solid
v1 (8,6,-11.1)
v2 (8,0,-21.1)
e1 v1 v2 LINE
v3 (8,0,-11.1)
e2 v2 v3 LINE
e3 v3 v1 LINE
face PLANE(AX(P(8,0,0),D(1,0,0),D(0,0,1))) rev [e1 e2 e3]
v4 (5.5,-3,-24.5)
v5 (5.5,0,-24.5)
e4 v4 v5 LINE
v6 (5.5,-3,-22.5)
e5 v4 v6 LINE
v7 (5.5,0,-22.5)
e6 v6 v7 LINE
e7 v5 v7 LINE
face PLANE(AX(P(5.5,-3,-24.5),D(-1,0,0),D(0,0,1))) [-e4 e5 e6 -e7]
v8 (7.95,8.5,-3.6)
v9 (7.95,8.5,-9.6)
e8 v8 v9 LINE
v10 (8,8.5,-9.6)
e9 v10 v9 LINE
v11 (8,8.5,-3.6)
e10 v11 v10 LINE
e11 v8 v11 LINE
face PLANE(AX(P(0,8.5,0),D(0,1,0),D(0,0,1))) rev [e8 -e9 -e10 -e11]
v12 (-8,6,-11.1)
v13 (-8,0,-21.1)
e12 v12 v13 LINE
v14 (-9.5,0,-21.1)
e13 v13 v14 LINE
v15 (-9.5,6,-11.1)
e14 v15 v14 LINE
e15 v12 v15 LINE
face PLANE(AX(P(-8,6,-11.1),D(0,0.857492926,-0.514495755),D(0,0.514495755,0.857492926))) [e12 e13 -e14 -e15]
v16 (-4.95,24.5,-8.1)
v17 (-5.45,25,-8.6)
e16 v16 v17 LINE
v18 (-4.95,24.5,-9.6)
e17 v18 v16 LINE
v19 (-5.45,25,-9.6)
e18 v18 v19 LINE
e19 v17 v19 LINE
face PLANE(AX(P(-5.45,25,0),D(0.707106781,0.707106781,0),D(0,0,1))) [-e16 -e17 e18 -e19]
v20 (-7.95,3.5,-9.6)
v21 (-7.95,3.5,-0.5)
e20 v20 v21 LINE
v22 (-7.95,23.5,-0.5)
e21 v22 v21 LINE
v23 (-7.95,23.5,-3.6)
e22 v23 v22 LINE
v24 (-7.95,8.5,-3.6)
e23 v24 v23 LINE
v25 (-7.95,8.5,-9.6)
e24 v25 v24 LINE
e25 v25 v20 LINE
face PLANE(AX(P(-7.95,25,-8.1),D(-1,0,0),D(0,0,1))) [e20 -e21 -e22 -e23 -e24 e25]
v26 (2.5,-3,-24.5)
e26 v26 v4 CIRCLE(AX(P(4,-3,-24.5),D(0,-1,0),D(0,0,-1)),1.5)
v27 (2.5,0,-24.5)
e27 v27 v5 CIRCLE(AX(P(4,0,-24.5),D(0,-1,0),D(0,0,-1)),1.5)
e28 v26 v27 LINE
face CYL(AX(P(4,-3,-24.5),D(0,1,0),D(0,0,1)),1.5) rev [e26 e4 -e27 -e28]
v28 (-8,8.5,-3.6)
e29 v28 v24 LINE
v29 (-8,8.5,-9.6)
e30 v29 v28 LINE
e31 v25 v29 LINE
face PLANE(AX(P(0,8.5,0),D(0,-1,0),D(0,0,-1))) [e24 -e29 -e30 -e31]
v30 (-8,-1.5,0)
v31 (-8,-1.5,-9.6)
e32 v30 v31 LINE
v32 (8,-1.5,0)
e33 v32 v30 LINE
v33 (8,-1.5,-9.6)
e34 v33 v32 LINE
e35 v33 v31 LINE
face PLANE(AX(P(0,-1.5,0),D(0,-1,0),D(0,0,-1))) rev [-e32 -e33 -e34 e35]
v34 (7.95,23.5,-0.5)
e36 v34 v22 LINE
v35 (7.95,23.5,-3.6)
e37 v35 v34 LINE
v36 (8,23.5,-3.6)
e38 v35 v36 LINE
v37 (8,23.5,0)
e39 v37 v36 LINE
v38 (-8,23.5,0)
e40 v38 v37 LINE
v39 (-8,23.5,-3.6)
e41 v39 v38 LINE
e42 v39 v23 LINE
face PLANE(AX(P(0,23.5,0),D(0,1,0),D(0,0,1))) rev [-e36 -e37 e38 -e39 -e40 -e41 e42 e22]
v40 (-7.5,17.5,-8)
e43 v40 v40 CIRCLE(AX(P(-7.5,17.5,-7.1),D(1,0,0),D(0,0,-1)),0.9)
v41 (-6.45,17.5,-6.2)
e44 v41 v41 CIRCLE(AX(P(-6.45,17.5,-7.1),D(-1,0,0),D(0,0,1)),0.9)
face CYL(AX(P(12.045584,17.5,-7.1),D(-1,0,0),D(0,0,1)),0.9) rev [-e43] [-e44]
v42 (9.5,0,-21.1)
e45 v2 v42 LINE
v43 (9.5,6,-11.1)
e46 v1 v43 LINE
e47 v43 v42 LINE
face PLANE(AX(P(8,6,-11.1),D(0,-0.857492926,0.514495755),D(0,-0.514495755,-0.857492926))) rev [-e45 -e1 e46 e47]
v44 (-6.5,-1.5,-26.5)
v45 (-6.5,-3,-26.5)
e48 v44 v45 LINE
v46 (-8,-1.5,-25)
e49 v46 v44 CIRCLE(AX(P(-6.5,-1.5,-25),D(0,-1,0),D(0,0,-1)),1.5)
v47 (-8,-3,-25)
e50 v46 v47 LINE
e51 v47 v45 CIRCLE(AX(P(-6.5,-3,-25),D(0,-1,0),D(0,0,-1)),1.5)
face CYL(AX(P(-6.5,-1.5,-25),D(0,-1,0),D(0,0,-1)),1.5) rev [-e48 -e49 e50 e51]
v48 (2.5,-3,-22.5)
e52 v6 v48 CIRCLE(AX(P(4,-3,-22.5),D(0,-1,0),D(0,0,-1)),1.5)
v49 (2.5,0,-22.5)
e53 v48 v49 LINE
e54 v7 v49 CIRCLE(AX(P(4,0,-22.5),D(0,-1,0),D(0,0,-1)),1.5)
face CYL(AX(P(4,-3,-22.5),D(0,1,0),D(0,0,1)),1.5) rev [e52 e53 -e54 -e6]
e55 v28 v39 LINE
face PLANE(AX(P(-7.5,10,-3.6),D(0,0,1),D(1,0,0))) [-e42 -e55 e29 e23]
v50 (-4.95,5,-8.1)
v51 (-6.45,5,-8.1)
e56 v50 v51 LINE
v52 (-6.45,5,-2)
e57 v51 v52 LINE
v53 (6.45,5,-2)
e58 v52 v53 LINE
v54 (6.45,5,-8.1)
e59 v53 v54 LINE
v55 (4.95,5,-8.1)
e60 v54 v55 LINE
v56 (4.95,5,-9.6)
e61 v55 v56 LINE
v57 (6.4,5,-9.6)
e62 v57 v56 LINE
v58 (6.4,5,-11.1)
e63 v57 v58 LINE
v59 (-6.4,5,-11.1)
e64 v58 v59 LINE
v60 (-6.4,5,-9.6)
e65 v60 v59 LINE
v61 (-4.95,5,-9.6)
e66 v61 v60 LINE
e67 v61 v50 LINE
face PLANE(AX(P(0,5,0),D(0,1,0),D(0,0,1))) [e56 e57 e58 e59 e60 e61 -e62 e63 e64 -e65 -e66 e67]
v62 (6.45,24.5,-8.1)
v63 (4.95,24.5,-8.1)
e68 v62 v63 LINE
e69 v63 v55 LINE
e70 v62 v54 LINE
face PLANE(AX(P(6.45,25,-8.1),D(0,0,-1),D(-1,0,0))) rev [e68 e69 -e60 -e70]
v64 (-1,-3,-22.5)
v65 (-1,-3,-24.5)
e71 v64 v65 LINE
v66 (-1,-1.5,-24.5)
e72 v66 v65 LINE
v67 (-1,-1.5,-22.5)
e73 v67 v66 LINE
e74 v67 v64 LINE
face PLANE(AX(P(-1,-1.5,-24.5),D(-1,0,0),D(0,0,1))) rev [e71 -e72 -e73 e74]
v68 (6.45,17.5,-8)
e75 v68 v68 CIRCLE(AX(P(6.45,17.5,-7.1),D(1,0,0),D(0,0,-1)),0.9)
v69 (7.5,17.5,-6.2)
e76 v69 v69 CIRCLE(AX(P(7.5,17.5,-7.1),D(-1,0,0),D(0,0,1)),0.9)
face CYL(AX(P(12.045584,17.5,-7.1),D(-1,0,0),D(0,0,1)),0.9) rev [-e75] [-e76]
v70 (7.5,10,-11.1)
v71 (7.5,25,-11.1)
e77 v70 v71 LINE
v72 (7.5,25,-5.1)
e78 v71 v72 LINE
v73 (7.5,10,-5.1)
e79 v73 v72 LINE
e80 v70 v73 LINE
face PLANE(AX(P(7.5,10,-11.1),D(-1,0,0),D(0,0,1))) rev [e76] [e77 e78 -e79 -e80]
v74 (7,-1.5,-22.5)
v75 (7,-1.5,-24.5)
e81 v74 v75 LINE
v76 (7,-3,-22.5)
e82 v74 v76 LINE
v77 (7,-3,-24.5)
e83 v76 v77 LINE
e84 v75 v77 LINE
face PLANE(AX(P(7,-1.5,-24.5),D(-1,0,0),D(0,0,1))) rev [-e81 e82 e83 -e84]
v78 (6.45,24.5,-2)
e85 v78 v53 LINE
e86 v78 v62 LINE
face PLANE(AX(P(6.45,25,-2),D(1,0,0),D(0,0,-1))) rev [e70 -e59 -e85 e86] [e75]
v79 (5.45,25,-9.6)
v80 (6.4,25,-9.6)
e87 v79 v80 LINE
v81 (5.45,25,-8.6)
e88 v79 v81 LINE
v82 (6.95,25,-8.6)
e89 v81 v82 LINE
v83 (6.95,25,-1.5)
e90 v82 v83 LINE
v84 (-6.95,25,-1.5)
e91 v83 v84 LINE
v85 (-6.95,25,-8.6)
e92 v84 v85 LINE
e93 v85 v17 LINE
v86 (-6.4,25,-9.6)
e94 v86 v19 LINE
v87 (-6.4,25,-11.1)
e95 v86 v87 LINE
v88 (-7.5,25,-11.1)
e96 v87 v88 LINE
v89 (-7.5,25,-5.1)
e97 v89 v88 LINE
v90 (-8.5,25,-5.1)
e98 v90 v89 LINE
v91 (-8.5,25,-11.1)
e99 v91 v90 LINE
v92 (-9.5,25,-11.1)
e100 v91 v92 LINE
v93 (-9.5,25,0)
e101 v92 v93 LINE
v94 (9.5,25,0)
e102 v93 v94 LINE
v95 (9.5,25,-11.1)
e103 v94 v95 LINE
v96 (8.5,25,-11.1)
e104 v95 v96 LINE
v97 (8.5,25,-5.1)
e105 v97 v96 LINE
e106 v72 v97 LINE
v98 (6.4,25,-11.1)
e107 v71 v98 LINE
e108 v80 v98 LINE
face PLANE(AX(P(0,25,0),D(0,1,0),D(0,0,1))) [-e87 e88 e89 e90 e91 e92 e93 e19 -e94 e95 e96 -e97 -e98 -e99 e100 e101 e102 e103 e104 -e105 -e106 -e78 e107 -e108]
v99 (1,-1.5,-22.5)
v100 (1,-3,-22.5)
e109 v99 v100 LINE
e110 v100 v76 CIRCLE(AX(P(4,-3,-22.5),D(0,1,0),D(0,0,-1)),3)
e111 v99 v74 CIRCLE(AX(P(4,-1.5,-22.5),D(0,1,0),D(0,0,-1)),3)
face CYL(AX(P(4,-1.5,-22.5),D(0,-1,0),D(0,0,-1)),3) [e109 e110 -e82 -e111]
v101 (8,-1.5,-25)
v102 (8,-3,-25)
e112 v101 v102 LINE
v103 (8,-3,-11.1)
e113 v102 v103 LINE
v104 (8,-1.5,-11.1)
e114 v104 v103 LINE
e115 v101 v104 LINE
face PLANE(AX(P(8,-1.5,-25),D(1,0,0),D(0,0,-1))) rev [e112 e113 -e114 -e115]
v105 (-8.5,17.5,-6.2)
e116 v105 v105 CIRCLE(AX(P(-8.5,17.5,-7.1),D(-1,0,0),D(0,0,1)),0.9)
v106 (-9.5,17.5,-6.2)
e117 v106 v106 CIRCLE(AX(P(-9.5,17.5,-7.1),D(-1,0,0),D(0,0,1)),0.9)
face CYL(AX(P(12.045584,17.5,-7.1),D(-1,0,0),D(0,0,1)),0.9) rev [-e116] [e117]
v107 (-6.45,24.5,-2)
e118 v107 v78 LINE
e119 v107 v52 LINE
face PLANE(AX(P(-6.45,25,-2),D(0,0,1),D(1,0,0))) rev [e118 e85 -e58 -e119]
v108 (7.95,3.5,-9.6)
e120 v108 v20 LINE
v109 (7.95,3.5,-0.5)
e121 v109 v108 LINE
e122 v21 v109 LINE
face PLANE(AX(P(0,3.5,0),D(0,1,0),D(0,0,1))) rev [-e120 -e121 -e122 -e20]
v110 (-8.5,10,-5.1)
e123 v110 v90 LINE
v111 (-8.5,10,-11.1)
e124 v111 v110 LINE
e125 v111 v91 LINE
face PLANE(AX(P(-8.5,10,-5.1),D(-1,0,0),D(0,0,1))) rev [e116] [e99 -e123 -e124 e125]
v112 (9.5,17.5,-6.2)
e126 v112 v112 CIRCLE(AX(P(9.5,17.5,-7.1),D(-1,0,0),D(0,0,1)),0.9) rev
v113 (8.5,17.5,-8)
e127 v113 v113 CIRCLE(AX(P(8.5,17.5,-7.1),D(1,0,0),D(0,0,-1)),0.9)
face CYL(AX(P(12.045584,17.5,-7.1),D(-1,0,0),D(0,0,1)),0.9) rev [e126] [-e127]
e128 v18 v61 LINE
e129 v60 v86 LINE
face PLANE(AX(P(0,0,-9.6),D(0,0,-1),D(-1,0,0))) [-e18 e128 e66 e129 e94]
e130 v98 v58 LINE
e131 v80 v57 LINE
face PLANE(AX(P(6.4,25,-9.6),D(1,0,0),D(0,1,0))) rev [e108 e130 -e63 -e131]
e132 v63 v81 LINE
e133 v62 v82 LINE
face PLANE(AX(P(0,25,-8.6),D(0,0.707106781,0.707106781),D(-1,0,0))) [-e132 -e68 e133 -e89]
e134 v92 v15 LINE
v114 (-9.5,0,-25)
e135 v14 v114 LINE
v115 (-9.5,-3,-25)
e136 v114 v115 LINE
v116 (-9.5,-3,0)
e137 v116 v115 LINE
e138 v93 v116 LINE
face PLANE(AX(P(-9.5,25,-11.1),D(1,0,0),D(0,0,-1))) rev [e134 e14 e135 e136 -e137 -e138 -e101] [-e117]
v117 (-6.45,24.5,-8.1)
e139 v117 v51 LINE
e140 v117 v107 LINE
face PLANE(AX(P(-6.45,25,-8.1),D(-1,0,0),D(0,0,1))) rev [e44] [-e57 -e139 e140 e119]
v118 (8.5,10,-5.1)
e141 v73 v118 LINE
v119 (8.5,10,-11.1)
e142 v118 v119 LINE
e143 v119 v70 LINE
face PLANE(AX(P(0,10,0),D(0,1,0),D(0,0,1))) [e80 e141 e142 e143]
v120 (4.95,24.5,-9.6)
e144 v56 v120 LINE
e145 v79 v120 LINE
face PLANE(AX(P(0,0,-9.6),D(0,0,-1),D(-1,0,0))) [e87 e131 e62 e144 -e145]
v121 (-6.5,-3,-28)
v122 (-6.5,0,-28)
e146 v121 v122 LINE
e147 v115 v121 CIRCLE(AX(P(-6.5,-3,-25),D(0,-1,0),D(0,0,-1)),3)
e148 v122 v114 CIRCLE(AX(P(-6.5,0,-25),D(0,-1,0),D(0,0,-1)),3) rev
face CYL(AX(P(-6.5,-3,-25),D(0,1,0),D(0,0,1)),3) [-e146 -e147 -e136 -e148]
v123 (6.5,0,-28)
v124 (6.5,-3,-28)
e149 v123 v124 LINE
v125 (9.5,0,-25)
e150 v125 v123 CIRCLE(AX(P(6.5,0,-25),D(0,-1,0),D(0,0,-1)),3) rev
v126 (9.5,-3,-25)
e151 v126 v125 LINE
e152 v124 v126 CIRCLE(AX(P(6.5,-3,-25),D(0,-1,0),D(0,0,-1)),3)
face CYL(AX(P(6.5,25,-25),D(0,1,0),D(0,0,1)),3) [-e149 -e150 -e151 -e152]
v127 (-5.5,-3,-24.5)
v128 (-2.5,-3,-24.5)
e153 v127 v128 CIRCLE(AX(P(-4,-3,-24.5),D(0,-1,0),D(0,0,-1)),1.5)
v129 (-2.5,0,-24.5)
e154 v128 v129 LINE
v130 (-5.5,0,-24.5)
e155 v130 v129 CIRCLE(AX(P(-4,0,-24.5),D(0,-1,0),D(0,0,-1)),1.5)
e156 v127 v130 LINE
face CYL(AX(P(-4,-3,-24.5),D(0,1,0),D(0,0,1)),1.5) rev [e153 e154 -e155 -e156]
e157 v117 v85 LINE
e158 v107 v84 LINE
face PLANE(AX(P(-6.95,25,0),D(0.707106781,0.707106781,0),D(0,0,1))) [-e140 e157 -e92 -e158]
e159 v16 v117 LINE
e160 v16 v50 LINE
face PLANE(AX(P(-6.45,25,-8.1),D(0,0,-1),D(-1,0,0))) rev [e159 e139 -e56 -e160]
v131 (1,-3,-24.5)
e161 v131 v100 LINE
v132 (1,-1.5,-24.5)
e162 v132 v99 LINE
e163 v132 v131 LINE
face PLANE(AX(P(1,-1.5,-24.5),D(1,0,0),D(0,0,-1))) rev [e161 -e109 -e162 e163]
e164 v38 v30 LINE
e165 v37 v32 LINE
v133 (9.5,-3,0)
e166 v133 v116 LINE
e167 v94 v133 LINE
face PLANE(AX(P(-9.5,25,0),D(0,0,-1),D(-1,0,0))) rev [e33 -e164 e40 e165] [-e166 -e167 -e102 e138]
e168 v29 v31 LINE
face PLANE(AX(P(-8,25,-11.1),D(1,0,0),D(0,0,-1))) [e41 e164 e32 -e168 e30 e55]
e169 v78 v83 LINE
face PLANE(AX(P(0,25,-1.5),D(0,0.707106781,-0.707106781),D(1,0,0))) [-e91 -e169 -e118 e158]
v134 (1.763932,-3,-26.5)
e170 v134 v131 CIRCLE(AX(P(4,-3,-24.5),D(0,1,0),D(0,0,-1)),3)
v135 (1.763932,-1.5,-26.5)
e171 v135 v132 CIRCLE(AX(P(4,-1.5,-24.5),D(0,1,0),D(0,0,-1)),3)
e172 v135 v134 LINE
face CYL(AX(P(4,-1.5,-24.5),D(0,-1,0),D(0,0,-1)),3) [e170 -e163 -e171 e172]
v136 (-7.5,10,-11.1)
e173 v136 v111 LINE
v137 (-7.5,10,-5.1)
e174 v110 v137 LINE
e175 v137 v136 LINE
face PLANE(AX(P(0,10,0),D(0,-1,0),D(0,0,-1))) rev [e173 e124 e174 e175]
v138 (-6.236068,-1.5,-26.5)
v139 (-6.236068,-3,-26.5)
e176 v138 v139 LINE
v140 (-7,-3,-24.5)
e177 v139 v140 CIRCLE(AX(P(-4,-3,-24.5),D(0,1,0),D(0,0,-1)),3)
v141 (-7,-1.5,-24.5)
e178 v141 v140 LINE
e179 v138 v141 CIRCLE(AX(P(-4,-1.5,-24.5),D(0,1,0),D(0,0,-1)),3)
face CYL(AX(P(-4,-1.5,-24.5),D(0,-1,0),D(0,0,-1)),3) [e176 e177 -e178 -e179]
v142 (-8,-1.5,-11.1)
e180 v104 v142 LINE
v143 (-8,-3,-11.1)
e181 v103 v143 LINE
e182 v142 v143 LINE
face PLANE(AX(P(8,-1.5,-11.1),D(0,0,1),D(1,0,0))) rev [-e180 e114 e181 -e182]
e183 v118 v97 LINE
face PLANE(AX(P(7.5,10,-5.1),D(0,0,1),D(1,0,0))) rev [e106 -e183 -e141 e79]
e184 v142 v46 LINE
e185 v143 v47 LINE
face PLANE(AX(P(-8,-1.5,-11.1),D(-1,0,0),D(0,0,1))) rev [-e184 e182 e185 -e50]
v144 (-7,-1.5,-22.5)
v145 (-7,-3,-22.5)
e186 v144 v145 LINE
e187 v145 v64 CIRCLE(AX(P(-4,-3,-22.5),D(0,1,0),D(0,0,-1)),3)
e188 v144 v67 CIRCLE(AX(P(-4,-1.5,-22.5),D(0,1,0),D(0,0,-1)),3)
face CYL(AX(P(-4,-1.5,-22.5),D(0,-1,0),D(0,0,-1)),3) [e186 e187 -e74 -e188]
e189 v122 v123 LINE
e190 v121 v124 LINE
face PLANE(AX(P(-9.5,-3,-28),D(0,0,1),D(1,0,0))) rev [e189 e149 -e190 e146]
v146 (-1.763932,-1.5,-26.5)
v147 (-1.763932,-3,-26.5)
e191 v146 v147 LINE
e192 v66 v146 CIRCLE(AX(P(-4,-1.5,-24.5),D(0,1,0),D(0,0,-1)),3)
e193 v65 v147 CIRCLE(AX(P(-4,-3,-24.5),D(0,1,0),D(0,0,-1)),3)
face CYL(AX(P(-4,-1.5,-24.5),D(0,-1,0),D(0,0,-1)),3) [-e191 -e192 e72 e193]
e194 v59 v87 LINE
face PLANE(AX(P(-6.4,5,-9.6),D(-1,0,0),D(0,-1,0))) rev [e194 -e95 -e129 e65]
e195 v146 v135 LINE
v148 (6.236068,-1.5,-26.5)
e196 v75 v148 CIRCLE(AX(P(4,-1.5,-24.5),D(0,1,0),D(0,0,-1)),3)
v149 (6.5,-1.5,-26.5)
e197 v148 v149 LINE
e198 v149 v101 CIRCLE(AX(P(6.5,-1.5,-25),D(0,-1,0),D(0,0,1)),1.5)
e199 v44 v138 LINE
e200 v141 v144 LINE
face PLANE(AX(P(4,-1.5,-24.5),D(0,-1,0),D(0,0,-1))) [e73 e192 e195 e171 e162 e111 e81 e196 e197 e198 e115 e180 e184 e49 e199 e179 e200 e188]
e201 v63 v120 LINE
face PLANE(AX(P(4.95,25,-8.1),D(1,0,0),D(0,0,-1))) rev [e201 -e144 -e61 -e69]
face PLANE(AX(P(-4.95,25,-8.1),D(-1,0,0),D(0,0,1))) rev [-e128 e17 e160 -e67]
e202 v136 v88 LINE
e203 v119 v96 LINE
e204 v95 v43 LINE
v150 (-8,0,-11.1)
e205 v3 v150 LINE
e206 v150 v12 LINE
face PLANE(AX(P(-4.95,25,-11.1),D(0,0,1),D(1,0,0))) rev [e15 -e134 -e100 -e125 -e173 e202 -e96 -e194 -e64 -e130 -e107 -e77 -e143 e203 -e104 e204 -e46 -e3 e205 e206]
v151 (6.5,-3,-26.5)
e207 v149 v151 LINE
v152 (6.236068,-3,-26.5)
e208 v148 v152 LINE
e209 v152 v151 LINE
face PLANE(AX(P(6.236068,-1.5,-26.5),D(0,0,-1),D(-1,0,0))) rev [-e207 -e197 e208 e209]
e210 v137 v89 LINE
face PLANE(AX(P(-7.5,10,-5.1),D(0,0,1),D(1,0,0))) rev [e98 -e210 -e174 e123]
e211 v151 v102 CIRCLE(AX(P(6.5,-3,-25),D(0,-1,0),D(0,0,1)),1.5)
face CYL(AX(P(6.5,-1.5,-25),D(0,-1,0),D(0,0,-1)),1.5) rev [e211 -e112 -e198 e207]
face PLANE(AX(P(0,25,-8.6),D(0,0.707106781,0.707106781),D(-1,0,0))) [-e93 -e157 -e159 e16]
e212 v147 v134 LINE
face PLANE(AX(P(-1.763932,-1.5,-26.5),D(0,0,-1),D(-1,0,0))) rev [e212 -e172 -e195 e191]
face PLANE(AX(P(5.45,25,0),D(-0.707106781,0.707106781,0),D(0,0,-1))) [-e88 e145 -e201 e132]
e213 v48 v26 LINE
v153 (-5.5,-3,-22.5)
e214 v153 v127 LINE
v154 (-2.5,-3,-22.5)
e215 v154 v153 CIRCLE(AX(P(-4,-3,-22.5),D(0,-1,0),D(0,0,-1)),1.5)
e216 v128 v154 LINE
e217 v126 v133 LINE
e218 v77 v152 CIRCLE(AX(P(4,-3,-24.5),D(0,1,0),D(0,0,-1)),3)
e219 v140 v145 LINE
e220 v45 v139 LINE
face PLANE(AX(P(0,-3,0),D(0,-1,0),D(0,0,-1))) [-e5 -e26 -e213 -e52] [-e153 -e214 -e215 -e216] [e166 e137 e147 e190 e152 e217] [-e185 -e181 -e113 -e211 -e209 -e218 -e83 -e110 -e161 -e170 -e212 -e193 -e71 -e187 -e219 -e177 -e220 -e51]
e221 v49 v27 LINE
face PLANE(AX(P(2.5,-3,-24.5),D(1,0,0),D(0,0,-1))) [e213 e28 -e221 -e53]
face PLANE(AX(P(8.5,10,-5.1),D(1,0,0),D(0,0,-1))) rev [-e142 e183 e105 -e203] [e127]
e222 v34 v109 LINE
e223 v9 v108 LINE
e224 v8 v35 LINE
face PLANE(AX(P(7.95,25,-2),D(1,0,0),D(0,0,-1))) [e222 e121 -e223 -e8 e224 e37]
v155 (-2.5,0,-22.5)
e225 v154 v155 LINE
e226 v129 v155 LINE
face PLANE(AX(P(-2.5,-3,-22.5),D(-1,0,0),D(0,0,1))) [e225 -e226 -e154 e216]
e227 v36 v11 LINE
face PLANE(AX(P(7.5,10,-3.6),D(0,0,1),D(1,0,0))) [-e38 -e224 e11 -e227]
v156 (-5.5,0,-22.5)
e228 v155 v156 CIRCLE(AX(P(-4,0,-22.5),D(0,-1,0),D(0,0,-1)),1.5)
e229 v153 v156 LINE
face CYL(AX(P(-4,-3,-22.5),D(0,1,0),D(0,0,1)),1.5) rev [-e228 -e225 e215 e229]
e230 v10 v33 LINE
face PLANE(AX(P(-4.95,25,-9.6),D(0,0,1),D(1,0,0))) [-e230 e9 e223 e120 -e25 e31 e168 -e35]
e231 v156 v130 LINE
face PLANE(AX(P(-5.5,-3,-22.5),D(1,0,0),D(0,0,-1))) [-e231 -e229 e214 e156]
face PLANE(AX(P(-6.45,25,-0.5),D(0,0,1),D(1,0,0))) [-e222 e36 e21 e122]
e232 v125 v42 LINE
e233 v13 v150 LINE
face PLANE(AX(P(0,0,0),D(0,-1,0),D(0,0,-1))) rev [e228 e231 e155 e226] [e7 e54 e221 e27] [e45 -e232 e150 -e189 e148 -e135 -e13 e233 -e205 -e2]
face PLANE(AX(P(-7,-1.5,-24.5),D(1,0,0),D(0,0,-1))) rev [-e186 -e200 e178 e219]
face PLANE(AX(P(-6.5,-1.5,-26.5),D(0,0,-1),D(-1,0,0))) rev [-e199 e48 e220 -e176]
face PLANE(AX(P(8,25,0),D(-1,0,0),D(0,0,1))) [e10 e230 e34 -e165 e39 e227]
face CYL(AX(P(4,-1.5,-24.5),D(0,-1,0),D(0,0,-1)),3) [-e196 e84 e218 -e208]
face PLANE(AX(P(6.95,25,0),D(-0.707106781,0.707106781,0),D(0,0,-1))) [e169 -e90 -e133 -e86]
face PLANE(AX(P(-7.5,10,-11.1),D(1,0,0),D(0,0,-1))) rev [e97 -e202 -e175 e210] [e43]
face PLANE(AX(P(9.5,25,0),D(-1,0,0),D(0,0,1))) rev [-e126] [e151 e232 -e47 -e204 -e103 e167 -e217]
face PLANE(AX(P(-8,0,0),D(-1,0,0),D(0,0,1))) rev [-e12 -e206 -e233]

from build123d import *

# Parameters (mm, degrees)
EXTRUDE_1_DEPTH     = 25
SKETCH_2_W          = 19
SKETCH_2_H          = 28
EXTRUDE_2_DEPTH     = 3
SKETCH_3_W          = 1
SKETCH_3_H          = 6
CUT_EXTRUDE_1_DEPTH = 15
CUT_EXTRUDE_START   = -19
SKETCH_4_R          = 0.9
CUT_EXTRUDE_2_DEPTH = 19
FILLET_1_R          = 3
EXTRUDE_3_DEPTH     = 1.5
EXTRUDE_4_DEPTH     = 5
CHAMFER_1_SIZE      = 0.5
SHELL_START         = -8
SHELL_1_DEPTH       = 16
SHELL_1_2_DEPTH     = 0.05
SHELL_START_2       = 7.95
SHELL_1_3_DEPTH     = 0.05
CUT_EXTRUDE_3_DEPTH = 1.5
SKETCH_8_W          = 12.8
SKETCH_8_H          = 20
CUT_EXTRUDE_4_DEPTH = 1.5


# Read off the part's stored shape, not the designer's step: 抽壳1
with BuildPart() as part:
    # 草图1 → 凸台-拉伸1 (new body)
    with BuildSketch(Plane(origin=(0, 0, 0), x_dir=(1, 0, 0), z_dir=(0, 1, 0))):
        Polygon((-9.5, 11.1), (-9.5, 0), (9.5, 0), (9.5, 11.1), (4.95, 11.1), (4.95, 8.1), (6.45, 8.1), (6.45, 2), (-6.45, 2), (-6.45, 8.1), (-4.95, 8.1), (-4.95, 11.1), align=None)
    extrude(amount=EXTRUDE_1_DEPTH)

    # 草图2 → 凸台-拉伸2 (add)
    with BuildSketch(Plane.XZ):
        with Locations((0, -14)):
            Rectangle(SKETCH_2_W, SKETCH_2_H)
        with BuildLine():
            Line((-2.5, -22.5), (-2.5, -24.5))
            ThreePointArc((-2.5, -24.5), (-4, -26), (-5.5, -24.5))
            Line((-5.5, -24.5), (-5.5, -22.5))
            ThreePointArc((-5.5, -22.5), (-4, -21), (-2.5, -22.5))
        make_face(mode=Mode.SUBTRACT)
        with BuildLine():
            Line((2.5, -24.5), (2.5, -22.5))
            ThreePointArc((2.5, -22.5), (4, -21), (5.5, -22.5))
            Line((5.5, -22.5), (5.5, -24.5))
            ThreePointArc((5.5, -24.5), (4, -26), (2.5, -24.5))
        make_face(mode=Mode.SUBTRACT)
    extrude(amount=EXTRUDE_2_DEPTH)

    # 草图3 → 切除-拉伸1 (cut)
    with BuildSketch(Plane(origin=(0, 25, 0), x_dir=(1, 0, 0), z_dir=(0, 1, 0))):
        with Locations((-8, 8.1)):
            Rectangle(SKETCH_3_W, SKETCH_3_H)
        with Locations((8, 8.1)):
            Rectangle(SKETCH_3_W, SKETCH_3_H)
    extrude(amount=-CUT_EXTRUDE_1_DEPTH, mode=Mode.SUBTRACT)

    # 草图4 → 切除-拉伸2 (cut)
    with BuildSketch(Plane.ZY.offset(9.5).offset(CUT_EXTRUDE_START)):
        with Locations((-7.1, 17.5)):
            Circle(SKETCH_4_R)
    extrude(amount=CUT_EXTRUDE_2_DEPTH, mode=Mode.SUBTRACT)

    # 圆角1
    fillet_1_edges = [part.edges().sort_by_distance(p)[0] for p in [
        (9.5, -1.5, -28),
        (-9.5, -1.5, -28),
    ]]
    fillet(fillet_1_edges, radius=FILLET_1_R)

    # 草图5 → 凸台-拉伸3 (add)
    with BuildSketch(Plane.ZY.offset(9.5)):
        Polygon((-11.1, 0), (-11.1, 6), (-21.1, 0), align=None)
    extrude_3 = extrude(amount=-EXTRUDE_3_DEPTH)

    # 镜向1: 凸台-拉伸3 across plane
    add(extrude_3.mirror(Plane(origin=(0, 0, 0), x_dir=(0, 0, 1), z_dir=(1, 0, 0))))

    # 草图6 → 凸台-拉伸4 (add)
    with BuildSketch(Plane(origin=(0, 0, 0), x_dir=(1, 0, 0), z_dir=(0, 1, 0))):
        Polygon((-6.45, 2), (6.45, 2), (6.45, 8.1), (4.95, 8.1), (4.95, 11.1), (-4.95, 11.1), (-4.95, 8.1), (-6.45, 8.1), align=None)
    extrude(amount=EXTRUDE_4_DEPTH)

    # 倒角1
    chamfer_1_edges = [part.edges().sort_by_distance(p)[0] for p in [
        (4.95, 25, -9.6),
        (5.7, 25, -8.1),
        (6.45, 25, -5.05),
        (0, 25, -2),
        (-6.45, 25, -5.05),
        (-5.7, 25, -8.1),
        (-4.95, 25, -9.6),
    ]]
    chamfer(chamfer_1_edges, length=CHAMFER_1_SIZE)

    # 抽壳1 outline → 抽壳1 (cut)
    with BuildSketch(Plane.YZ.offset(SHELL_START)):
        Polygon((3.5, -0.5), (23.5, -0.5), (23.5, 0), (-1.5, 0), (-1.5, -9.6), (3.5, -9.6), align=None)
    extrude(amount=SHELL_1_DEPTH, mode=Mode.SUBTRACT)

    # Shell 1 2 outline → Shell 1 2 (cut)
    with BuildSketch(Plane.YZ.offset(SHELL_START)):
        Polygon((8.5, -3.6), (23.5, -3.6), (23.5, -0.5), (3.5, -0.5), (3.5, -9.6), (8.5, -9.6), align=None)
    extrude(amount=SHELL_1_2_DEPTH, mode=Mode.SUBTRACT)

    # Shell 1 3 outline → Shell 1 3 (cut)
    with BuildSketch(Plane.YZ.offset(SHELL_START_2)):
        Polygon((8.5, -3.6), (23.5, -3.6), (23.5, -0.5), (3.5, -0.5), (3.5, -9.6), (8.5, -9.6), align=None)
    extrude(amount=SHELL_1_3_DEPTH, mode=Mode.SUBTRACT)

    # 草图7 → 切除-拉伸3 (cut)
    with BuildSketch(Plane.XZ.offset(3)):
        with BuildLine():
            Line((8, -11.1), (-8, -11.1))
            Line((-8, -11.1), (-8, -25))
            ThreePointArc((-8, -25), (-7.560660172, -26.060660172), (-6.5, -26.5))
            Line((-6.5, -26.5), (-6.236067977, -26.5))
            ThreePointArc((-6.236067977, -26.5), (-6.802517077, -25.570466269), (-7, -24.5))
            Line((-7, -24.5), (-7, -22.5))
            ThreePointArc((-7, -22.5), (-4, -19.5), (-1, -22.5))
            Line((-1, -22.5), (-1, -24.5))
            ThreePointArc((-1, -24.5), (-1.197482923, -25.570466269), (-1.763932023, -26.5))
            Line((-1.763932023, -26.5), (1.763932023, -26.5))
            ThreePointArc((1.763932023, -26.5), (1.197482923, -25.570466269), (1, -24.5))
            Line((1, -24.5), (1, -22.5))
            ThreePointArc((1, -22.5), (4, -19.5), (7, -22.5))
            Line((7, -22.5), (7, -24.5))
            ThreePointArc((7, -24.5), (6.802517077, -25.570466269), (6.236067977, -26.5))
            Line((6.236067977, -26.5), (6.5, -26.5))
            ThreePointArc((6.5, -26.5), (7.560660172, -26.060660172), (8, -25))
            Line((8, -25), (8, -11.1))
        make_face()
    extrude(amount=-CUT_EXTRUDE_3_DEPTH, mode=Mode.SUBTRACT)

    # 草图8 → 切除-拉伸4 (cut)
    with BuildSketch(Plane(origin=(0, 0, -11.1), x_dir=(-1, 0, 0), z_dir=(0, 0, -1))):
        with Locations((0, 15)):
            Rectangle(SKETCH_8_W, SKETCH_8_H)
    extrude(amount=-CUT_EXTRUDE_4_DEPTH, mode=Mode.SUBTRACT)


solid = part.part
